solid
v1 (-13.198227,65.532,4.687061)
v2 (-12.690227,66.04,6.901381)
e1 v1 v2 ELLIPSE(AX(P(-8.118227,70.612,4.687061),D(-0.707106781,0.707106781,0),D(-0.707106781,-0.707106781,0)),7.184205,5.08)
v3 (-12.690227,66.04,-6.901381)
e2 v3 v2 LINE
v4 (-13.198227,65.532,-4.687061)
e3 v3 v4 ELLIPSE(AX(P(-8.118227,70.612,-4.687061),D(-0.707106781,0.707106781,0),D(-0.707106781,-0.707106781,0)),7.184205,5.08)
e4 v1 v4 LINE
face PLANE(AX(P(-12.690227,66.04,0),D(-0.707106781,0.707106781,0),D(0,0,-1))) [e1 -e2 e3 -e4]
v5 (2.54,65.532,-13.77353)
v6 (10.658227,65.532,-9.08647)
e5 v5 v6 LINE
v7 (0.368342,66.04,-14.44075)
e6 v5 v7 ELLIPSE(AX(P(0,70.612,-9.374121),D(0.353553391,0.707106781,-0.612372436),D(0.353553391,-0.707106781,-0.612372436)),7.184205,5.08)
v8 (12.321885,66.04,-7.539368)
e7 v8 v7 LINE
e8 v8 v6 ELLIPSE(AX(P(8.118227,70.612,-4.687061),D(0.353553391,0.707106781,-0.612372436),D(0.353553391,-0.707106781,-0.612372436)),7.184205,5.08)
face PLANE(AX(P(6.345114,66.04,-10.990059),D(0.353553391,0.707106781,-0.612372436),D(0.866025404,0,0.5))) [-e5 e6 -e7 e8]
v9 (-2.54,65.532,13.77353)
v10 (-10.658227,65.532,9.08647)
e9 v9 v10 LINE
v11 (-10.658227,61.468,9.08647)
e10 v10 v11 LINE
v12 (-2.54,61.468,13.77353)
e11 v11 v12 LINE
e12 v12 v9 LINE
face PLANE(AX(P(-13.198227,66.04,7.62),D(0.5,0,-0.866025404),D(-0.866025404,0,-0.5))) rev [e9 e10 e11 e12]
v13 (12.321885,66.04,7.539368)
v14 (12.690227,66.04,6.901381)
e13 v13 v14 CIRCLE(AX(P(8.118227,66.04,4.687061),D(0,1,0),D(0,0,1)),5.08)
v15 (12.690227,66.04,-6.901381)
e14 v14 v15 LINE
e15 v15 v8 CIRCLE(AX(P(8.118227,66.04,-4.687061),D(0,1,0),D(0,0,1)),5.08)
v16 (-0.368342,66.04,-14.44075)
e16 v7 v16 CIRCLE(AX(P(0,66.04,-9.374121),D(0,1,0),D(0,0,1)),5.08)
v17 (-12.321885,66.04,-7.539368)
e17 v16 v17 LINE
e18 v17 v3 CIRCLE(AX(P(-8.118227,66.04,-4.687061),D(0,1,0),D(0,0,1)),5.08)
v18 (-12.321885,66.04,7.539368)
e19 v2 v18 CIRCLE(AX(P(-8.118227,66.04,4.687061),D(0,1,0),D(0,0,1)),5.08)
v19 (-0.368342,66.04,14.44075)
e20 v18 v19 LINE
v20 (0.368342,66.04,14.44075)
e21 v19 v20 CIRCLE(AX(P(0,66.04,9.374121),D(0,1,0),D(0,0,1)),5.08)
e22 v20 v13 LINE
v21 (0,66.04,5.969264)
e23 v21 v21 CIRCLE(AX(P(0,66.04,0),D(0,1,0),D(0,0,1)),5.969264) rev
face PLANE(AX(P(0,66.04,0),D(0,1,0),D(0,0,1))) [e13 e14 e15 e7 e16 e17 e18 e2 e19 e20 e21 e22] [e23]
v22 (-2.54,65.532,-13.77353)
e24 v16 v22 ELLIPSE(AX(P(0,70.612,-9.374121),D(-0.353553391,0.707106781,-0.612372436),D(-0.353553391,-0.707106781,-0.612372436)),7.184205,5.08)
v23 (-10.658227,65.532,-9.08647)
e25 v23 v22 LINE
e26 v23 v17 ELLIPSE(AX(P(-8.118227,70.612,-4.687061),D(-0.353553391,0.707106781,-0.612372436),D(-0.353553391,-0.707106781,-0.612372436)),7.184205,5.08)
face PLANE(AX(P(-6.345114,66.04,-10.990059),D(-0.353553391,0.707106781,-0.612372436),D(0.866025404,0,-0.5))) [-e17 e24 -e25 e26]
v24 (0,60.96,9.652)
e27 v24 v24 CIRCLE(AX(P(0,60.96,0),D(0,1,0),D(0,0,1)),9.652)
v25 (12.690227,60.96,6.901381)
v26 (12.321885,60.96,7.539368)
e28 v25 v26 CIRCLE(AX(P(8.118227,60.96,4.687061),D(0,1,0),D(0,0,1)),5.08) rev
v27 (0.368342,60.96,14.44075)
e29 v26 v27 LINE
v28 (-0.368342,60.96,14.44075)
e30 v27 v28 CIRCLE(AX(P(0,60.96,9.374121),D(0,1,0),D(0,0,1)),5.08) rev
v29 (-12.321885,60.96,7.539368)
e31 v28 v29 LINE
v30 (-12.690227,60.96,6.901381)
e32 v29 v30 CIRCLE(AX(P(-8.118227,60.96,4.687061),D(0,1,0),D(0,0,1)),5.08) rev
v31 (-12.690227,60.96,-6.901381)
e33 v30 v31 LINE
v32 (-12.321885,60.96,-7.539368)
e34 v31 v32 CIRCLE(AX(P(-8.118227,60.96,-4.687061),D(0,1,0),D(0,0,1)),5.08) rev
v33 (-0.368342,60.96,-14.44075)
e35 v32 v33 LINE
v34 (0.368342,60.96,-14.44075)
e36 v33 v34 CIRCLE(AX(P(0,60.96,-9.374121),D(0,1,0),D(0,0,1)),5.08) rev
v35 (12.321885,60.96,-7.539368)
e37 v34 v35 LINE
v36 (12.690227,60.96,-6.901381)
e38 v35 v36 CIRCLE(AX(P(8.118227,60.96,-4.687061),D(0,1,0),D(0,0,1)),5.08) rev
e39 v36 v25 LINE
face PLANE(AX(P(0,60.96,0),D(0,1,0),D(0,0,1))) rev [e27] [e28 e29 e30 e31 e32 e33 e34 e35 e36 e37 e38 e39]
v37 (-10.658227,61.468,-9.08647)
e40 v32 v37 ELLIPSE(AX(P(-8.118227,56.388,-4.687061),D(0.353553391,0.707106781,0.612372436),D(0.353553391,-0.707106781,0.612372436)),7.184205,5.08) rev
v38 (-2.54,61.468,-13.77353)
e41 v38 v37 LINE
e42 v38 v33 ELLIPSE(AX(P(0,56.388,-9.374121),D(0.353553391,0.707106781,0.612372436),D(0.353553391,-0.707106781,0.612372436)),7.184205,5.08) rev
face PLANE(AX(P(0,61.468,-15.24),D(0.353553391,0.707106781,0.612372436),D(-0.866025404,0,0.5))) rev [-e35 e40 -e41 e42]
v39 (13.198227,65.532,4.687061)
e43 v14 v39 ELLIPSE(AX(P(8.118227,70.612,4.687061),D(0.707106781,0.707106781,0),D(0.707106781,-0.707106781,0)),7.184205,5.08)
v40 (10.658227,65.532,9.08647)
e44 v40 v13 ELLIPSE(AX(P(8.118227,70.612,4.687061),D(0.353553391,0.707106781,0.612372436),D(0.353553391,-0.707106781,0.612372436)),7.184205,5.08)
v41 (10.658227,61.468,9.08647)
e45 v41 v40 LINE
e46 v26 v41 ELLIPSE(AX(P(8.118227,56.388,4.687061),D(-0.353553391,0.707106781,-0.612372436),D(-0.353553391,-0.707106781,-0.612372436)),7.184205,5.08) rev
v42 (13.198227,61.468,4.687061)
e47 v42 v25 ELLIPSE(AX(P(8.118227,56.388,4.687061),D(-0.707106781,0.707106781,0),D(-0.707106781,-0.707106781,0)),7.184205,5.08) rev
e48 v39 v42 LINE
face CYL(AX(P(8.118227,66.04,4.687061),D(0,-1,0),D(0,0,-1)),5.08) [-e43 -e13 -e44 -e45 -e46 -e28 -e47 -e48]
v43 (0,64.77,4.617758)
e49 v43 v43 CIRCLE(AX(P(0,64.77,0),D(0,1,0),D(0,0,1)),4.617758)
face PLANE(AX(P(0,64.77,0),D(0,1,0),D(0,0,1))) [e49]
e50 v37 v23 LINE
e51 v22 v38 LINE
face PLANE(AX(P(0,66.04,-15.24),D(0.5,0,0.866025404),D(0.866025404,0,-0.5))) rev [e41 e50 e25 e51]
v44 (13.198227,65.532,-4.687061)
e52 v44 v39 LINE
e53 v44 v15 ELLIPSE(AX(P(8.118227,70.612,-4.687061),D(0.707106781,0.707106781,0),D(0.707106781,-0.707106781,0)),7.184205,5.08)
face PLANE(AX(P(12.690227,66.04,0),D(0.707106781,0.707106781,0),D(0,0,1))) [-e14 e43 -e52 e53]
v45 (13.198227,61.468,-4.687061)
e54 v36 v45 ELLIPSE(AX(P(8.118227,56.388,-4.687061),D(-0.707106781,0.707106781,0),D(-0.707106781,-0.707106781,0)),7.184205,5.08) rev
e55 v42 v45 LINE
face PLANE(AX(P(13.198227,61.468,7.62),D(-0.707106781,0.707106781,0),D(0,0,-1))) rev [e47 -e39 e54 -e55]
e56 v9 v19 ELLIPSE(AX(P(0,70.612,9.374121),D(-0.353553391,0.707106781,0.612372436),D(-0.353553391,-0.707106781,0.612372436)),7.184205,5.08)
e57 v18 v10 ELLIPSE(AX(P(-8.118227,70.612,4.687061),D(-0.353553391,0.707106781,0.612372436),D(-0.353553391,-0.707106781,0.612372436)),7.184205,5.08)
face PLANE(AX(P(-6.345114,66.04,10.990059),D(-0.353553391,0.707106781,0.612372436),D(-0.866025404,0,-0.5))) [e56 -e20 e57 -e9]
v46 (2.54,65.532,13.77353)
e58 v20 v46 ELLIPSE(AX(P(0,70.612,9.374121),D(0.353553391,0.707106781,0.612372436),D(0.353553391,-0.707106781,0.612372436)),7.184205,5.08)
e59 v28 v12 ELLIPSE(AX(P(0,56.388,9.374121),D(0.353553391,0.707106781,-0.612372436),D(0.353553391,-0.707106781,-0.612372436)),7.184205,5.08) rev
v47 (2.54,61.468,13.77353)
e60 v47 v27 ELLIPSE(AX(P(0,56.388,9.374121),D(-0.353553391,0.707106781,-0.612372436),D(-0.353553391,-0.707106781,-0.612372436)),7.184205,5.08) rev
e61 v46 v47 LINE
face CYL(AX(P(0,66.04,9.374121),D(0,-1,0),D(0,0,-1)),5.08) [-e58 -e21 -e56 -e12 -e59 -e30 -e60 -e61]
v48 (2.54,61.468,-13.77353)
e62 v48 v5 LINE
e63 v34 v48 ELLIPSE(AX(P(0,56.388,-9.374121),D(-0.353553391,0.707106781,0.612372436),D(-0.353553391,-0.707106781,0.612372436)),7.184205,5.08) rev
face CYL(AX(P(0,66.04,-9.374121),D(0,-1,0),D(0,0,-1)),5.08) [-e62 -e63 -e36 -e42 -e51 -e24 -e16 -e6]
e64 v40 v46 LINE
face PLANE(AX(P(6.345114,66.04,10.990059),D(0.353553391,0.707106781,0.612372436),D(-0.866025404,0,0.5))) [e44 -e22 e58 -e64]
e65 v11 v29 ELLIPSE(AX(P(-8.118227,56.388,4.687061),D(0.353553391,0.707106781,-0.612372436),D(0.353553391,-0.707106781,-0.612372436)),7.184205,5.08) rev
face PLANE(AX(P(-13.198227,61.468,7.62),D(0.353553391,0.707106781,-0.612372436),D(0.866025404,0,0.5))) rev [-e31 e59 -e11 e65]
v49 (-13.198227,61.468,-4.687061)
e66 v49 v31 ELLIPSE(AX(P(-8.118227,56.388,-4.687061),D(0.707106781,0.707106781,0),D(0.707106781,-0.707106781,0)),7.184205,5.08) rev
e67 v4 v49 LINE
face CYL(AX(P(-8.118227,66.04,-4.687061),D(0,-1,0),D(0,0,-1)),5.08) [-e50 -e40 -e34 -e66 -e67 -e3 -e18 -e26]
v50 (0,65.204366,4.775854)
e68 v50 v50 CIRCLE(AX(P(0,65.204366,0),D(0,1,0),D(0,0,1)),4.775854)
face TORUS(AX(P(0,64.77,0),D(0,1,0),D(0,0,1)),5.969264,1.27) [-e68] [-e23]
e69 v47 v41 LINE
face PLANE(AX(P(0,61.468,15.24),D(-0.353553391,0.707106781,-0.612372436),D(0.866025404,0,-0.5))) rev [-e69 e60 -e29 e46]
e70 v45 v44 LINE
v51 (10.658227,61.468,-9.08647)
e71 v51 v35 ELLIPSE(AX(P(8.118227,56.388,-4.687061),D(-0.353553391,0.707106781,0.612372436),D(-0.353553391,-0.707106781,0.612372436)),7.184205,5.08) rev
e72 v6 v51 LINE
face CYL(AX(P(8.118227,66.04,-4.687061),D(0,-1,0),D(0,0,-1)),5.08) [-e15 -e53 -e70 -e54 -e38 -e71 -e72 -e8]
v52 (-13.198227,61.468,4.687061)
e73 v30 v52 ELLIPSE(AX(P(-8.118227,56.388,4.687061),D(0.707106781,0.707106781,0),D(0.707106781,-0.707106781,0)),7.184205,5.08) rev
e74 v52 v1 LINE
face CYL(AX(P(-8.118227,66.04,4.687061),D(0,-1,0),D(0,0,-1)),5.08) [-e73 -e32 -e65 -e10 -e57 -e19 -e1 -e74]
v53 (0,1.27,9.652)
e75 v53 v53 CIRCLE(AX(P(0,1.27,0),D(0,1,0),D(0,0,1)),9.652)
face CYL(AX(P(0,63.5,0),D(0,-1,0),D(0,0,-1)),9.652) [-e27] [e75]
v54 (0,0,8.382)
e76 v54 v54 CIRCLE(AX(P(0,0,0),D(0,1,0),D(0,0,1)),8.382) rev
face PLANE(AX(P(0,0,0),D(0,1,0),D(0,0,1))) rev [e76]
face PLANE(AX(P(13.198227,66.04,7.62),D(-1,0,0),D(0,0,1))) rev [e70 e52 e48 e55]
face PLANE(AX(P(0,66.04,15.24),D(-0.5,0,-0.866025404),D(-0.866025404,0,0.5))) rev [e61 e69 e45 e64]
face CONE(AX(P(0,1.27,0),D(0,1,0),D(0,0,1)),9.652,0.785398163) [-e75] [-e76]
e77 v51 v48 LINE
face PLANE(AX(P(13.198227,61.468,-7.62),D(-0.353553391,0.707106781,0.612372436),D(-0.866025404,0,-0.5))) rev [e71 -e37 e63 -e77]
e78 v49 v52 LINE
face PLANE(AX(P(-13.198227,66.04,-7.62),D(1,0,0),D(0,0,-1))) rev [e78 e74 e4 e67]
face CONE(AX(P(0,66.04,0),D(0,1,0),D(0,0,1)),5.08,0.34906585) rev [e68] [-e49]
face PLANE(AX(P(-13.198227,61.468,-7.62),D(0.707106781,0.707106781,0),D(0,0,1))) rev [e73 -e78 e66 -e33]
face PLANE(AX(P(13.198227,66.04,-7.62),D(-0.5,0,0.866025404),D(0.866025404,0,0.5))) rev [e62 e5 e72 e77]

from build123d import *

# Parameters (mm, degrees)
SKETCH2_R           = 9.652
BOSS_EXTRUDE1_DEPTH = 63.5
CHAMFER1_SIZE       = 1.27
BOSS_EXTRUDE2_DEPTH = 2.54
CHAMFER2_SIZE       = 0.508
FILLET1_R           = 5.08
SKETCH7_R           = 5.08
CUT_EXTRUDE1_DEPTH  = 1.27
CUT_EXTRUDE1_DRAFT  = -20
FILLET2_R           = 1.27


with BuildPart() as part:
    # Sketch2 → Boss-Extrude1 (new body)
    with BuildSketch(Plane(origin=(0, 0, 0), x_dir=(1, 0, 0), z_dir=(0, 1, 0))):
        with Locations(Location((0, 0, 0), (0, 0, 270))):
            Circle(SKETCH2_R)
    extrude(amount=BOSS_EXTRUDE1_DEPTH)

    # Chamfer1
    chamfer1_edges = [part.edges().sort_by_distance(p)[0] for p in [
        (0, 0, -9.652),
    ]]
    chamfer(chamfer1_edges, length=CHAMFER1_SIZE)

    # Sketch6 → Boss-Extrude2 (add, symmetric)
    with BuildSketch(Plane(origin=(0, 63.5, 0), x_dir=(1, 0, 0), z_dir=(0, 1, 0))):
        Polygon((0, 15.24), (-13.198227154, 7.62), (-13.198227154, -7.62), (0, -15.24), (13.198227154, -7.62), (13.198227154, 7.62), align=None)
    extrude(amount=BOSS_EXTRUDE2_DEPTH, both=True)

    # Chamfer2
    chamfer2_edges = [part.edges().sort_by_distance(p)[0] for p in [
        (-13.198227154, 60.96, 0),
        (-6.599113577, 60.96, 11.43),
        (6.599113577, 60.96, 11.43),
        (13.198227154, 60.96, 0),
        (6.599113577, 66.04, -11.43),
        (-6.599113577, 66.04, -11.43),
        (-13.198227154, 66.04, 0),
        (-6.599113577, 66.04, 11.43),
        (6.599113577, 66.04, 11.43),
        (13.198227154, 66.04, 0),
        (6.599113577, 60.96, -11.43),
        (-6.599113577, 60.96, -11.43),
    ]]
    chamfer(chamfer2_edges, length=CHAMFER2_SIZE)

    # Fillet1
    # the kernel refuses this fillet: 5.08 mm, written as the material it takes off along each edge
    with BuildSketch(Plane(origin=(-13.198227154, 54.135651581, -7.62), x_dir=(0, 0, 1), z_dir=(0, 1, 0)), Plane(origin=(13.198227154, 72.864348419, 7.62), x_dir=(-0.8660254037844387, 0, 0.5), z_dir=(0, -1, 0))) as fillet1_piece_1:
        with BuildLine():
            CenterArc((FILLET1_R * 0.57735026919, FILLET1_R), FILLET1_R, 210, 60)
            Line((-FILLET1_R * 0.288675134595, FILLET1_R * 0.5), (0, 0))
            Line((0, 0), (FILLET1_R * 0.57735026919, 0))
        make_face()
    extrude(amount=18.728696837, mode=Mode.SUBTRACT)
    with BuildSketch(Plane(origin=(-13.198227154, 54.135651581, 7.62), x_dir=(0, 0, -1), z_dir=(0, 1, 0)), Plane(origin=(0, 72.864348419, -15.24), x_dir=(-0.8660254037844386, 0, 0.5), z_dir=(0, -1, 0)), Plane(origin=(13.198227154, 72.864348419, -7.62), x_dir=(-0.8660254037844388, 0, -0.4999999999999998), z_dir=(0, -1, 0)), Plane(origin=(0, 54.135651581, 15.24), x_dir=(-0.8660254037844386, 0, -0.5000000000000001), z_dir=(0, 1, 0))) as fillet1_piece_2:
        with BuildLine():
            CenterArc((FILLET1_R * 0.57735026919, -FILLET1_R), FILLET1_R, 90, 60)
            Line((-FILLET1_R * 0.288675134595, -FILLET1_R * 0.5), (0, 0))
            Line((0, 0), (FILLET1_R * 0.57735026919, 0))
        make_face()
    extrude(amount=18.728696837, mode=Mode.SUBTRACT)


with BuildPart() as cut_extrude1_tool:
    # Sketch7 → Cut-Extrude1 (with draft: the straight prism first)
    with BuildSketch(Plane(origin=(0, 66.04, 0), x_dir=(1, 0, 0), z_dir=(0, 1, 0))):
        Circle(SKETCH7_R)
    extrude(amount=-CUT_EXTRUDE1_DEPTH)
    # Cut-Extrude1: the draft: its side faces are tilted about the plane it starts from
    cut_extrude1_sides = [cut_extrude1_tool.faces().sort_by_distance(p)[0] for p in [
        (-5.08, 65.405, 0),
    ]]
    draft(cut_extrude1_sides, Plane(origin=(0, 66.04, 0), x_dir=(1, 0, 0), z_dir=(0, 1, 0)), CUT_EXTRUDE1_DRAFT)


with BuildPart() as part_1:
    add(part.part)

    # Cut-Extrude1: cut by cut_extrude1_tool
    add(cut_extrude1_tool.part, mode=Mode.SUBTRACT)

    # Fillet2
    fillet2_edges = [part_1.edges().sort_by_distance(p)[0] for p in [
        (-5.08, 66.04, 0),
    ]]
    fillet(fillet2_edges, radius=FILLET2_R)


solid = part_1.part
